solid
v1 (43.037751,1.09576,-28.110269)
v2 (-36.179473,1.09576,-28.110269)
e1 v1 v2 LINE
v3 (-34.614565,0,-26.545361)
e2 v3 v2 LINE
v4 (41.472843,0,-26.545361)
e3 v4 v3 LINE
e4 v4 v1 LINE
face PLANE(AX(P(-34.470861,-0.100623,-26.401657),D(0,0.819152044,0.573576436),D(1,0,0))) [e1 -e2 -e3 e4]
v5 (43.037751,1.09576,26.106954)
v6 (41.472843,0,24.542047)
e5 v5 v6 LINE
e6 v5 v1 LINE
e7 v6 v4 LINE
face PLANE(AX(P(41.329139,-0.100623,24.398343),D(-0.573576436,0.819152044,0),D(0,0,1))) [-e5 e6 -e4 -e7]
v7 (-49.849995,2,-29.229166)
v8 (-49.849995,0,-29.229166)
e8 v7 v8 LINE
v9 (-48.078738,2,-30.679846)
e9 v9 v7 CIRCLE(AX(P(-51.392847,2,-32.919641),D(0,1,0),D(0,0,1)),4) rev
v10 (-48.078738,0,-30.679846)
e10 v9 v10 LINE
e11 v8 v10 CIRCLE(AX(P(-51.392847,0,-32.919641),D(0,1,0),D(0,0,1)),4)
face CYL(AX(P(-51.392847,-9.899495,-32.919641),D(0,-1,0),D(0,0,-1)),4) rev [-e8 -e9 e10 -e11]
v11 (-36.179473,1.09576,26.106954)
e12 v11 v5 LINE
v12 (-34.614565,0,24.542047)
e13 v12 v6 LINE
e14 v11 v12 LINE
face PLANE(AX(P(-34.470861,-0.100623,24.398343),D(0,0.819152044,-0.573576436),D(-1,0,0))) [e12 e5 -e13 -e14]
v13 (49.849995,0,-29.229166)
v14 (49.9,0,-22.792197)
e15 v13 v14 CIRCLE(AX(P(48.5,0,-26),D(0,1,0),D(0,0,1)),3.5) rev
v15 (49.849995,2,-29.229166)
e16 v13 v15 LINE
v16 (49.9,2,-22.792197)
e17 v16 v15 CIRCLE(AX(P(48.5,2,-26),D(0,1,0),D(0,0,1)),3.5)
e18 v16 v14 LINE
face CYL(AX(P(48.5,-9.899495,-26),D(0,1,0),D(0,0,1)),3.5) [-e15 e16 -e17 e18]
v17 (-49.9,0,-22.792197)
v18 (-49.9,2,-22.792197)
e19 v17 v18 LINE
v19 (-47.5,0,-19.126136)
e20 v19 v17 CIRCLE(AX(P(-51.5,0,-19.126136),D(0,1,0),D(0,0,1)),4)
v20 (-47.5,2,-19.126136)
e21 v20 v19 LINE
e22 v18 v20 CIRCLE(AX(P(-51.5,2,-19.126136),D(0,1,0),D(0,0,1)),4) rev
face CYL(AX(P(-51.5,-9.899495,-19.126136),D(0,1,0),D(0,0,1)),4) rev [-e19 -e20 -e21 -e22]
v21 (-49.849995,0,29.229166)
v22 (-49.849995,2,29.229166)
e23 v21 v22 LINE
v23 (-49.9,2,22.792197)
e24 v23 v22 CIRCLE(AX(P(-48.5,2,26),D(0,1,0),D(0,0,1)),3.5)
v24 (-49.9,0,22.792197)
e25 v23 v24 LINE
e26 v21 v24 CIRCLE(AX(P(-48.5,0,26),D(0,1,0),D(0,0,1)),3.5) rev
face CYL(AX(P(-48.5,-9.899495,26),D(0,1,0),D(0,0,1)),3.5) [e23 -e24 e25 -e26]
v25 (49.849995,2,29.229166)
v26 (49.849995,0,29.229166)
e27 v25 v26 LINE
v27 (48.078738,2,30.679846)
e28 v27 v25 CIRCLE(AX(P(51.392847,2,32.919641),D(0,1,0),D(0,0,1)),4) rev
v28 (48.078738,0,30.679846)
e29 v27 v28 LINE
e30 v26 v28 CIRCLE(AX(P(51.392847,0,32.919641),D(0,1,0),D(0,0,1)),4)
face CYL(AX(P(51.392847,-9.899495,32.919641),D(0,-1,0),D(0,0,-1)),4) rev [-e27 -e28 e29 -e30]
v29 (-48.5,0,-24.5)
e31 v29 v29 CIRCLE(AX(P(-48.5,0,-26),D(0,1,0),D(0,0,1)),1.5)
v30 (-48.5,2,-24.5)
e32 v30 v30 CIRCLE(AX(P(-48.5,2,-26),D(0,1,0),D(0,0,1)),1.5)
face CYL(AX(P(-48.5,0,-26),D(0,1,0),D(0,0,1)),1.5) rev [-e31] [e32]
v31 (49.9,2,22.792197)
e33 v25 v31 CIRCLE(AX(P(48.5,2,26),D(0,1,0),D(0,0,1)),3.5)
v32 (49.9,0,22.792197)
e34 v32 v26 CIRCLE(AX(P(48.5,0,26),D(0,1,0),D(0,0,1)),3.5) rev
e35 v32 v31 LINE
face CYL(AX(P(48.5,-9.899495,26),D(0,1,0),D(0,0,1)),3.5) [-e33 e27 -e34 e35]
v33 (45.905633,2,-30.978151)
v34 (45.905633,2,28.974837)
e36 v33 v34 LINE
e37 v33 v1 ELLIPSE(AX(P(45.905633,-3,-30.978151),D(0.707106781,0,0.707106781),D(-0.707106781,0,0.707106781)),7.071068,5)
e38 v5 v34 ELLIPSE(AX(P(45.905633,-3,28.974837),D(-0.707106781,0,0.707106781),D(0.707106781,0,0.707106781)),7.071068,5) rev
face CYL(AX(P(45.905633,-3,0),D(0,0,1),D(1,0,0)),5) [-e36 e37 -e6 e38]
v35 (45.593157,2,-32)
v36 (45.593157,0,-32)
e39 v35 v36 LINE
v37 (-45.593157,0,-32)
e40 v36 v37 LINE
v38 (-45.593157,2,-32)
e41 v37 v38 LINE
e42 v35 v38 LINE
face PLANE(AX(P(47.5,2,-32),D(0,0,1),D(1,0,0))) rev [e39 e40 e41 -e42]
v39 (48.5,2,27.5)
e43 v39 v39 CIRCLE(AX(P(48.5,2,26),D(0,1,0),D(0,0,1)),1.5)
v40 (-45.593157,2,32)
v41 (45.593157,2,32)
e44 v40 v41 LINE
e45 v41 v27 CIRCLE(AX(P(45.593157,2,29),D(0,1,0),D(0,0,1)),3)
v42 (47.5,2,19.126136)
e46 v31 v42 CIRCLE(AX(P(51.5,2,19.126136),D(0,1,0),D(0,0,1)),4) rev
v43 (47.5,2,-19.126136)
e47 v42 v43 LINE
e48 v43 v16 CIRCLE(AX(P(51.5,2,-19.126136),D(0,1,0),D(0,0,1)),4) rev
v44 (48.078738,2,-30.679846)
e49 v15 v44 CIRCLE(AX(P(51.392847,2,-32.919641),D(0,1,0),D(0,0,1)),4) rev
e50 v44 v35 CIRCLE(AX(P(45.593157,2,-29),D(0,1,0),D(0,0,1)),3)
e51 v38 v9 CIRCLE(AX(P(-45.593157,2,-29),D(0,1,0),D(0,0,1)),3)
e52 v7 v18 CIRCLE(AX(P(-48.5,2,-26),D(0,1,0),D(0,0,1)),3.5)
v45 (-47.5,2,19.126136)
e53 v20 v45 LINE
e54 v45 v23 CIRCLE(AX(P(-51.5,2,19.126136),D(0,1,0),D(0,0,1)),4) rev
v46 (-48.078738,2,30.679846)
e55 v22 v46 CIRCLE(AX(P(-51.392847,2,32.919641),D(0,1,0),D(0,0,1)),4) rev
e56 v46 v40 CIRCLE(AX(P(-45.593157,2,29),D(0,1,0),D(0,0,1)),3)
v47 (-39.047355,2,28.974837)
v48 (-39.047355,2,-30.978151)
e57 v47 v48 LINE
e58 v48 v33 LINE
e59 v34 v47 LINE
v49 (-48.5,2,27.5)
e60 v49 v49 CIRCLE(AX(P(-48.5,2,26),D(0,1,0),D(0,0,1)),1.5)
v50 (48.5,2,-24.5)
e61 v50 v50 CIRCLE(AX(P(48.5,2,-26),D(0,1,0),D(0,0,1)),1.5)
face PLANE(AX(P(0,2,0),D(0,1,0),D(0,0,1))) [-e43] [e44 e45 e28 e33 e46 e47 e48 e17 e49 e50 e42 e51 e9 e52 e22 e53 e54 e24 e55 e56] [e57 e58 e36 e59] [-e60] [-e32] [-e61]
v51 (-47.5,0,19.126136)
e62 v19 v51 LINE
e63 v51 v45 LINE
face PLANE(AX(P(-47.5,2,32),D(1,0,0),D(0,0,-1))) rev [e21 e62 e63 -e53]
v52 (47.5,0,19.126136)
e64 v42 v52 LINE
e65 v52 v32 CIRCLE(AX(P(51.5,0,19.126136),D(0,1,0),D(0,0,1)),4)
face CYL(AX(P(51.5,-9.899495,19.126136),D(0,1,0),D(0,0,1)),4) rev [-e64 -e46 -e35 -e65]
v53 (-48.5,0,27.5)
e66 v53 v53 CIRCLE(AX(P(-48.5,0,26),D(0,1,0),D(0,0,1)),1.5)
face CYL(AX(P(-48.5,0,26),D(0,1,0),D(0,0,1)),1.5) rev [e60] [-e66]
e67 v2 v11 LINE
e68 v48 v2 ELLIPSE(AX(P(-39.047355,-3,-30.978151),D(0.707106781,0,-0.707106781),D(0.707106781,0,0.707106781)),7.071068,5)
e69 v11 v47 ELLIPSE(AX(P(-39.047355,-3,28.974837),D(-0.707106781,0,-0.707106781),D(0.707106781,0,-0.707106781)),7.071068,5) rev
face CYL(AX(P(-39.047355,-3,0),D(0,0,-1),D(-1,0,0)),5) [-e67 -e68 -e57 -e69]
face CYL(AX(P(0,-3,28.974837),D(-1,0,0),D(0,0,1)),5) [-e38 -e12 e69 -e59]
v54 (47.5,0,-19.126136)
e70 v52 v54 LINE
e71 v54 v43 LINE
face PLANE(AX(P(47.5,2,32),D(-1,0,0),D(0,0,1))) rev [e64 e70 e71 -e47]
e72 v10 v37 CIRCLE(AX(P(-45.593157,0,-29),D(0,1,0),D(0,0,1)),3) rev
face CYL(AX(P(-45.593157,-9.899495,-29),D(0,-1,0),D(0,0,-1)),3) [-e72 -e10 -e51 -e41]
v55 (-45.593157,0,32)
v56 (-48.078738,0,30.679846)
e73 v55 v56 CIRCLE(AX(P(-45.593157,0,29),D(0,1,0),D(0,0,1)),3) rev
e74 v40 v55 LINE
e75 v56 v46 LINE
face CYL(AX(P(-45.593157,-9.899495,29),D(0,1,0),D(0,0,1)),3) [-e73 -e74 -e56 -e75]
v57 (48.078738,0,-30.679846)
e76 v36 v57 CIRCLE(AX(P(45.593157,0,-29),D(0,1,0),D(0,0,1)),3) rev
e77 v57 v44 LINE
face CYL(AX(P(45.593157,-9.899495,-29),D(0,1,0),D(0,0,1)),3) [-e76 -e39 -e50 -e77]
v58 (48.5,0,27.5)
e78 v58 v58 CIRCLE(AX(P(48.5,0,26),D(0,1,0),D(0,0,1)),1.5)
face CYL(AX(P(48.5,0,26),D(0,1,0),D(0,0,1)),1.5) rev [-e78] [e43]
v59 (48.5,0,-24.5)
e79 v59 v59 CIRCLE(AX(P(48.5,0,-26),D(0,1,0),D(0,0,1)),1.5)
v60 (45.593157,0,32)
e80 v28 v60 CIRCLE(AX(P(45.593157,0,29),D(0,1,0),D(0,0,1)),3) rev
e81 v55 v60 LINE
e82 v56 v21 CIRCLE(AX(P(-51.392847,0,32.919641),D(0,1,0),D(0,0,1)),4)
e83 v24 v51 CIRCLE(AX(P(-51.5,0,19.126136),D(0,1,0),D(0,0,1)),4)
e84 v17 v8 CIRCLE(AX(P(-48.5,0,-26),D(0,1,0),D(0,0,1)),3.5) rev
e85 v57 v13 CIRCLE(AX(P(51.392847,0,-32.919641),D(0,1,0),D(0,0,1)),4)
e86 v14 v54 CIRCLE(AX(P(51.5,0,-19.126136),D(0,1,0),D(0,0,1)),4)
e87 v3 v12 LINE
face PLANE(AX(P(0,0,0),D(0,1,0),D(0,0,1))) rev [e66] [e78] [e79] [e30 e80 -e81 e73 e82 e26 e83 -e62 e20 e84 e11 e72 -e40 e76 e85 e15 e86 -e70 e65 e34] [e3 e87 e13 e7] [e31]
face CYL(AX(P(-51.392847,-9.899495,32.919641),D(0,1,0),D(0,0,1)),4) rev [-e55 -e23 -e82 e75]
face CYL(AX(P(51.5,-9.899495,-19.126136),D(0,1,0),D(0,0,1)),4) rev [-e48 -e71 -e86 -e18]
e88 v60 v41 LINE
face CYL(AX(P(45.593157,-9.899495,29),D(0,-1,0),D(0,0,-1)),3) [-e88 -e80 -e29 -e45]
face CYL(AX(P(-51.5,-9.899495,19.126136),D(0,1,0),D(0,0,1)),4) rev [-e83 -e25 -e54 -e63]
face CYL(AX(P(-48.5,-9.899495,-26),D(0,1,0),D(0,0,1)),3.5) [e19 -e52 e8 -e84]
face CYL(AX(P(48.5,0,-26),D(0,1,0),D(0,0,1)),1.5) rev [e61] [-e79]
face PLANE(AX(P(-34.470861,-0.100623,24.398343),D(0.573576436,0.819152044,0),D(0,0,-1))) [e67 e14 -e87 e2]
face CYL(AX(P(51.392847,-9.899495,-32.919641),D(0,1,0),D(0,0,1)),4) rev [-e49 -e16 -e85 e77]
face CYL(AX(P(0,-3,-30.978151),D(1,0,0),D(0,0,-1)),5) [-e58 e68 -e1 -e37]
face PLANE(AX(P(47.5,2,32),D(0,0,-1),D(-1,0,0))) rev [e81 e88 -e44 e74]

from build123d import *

# Parameters (mm, degrees)
SKETCH1_W           = 95
SKETCH1_H           = 64
BOSS_EXTRUDE1_DEPTH = 2
SKETCH2_R           = 3.5
BOSS_EXTRUDE2_DEPTH = 2
FILLET1_R           = 4
FILLET2_R           = 3
SKETCH3_R           = 1.5
CUT_EXTRUDE1_DEPTH  = 62.090097397
SKETCH4_W           = 75.8
SKETCH4_H           = 50.8
CUT_EXTRUDE2_DEPTH  = 62.090097397
CHAMFER1_SIZE       = 3
CHAMFER1_SIZE_2     = 2.100622615
FILLET3_R           = 5


with BuildPart() as part:
    # Sketch1 → Boss-Extrude1 (new body)
    with BuildSketch(Plane(origin=(0, 0, 0), x_dir=(1, 0, 0), z_dir=(0, 1, 0))):
        Rectangle(SKETCH1_W, SKETCH1_H)
    extrude(amount=BOSS_EXTRUDE1_DEPTH)

    # Sketch2 → Boss-Extrude2 (add)
    with BuildSketch(Plane(origin=(0, 2, 0), x_dir=(1, 0, 0), z_dir=(0, 1, 0))):
        with Locations((-48.5, -26)):
            Circle(SKETCH2_R)
        with Locations((-48.5, 26)):
            Circle(SKETCH2_R)
        with Locations((48.5, -26)):
            Circle(SKETCH2_R)
        with Locations((48.5, 26)):
            Circle(SKETCH2_R)
    extrude(amount=-BOSS_EXTRUDE2_DEPTH)

    # Fillet1
    # the kernel refuses this fillet: 4 mm, written as the material it adds along each edge
    with BuildSketch(Plane(origin=(-47.5, 0, -29.354101966), x_dir=(0, 0, -1), z_dir=(0, 1, 0))) as fillet1_piece_1:
        with BuildLine():
            CenterArc((3.565539249, 3.892847292), FILLET1_R, 202.68800958, 54.020199403)
            Line((-0.124936066, 2.349995403), (-0.198745572, 2.319138365))
            ThreePointArc((-0.198745572, 2.319138365), (0.061075022, 1.181565792), (-0.076665188, 0.022857143))
            Line((-0.076665188, 0.022857143), (0, -0.08))
            ThreePointArc((0, -0.08), (1.322949017, -0.08), (2.627505209, -0.077856946))
            Line((2.627505209, -0.077856946), (2.645898034, 0))
        make_face()
    extrude(amount=2)
    with BuildSketch(Plane(origin=(-47.5, 0, -22.645898034), x_dir=(-0.998147228603926, 0, -0.06084496717315217), z_dir=(0, 1, 0)), Plane(origin=(47.5, 0, 22.645898034), x_dir=(0.9981472286039255, 0, 0.06084496717316137), z_dir=(0, 1, 0))) as fillet1_piece_2:
        with BuildLine():
            CenterArc((3.778429137, 3.756620131), FILLET1_R, 183.48831444, 66.421821522)
            Line((-0.214159778, 3.513240263), (-0.294011556, 3.508372665))
            Line((-0.294011556, 3.508372665), (-0.079851778, -0.004867597))
            Line((-0.079851778, -0.004867597), (0.027479485, -0.075132403))
            ThreePointArc((0.027479485, -0.075132403), (1.202227453, 0.132957385), (2.376975421, -0.075132403))
            Line((2.376975421, -0.075132403), (2.404454905, 0))
        make_face()
    extrude(amount=2)
    with BuildSketch(Plane(origin=(-47.5, 0, 22.645898034), x_dir=(0, 0, -1), z_dir=(0, 1, 0)), Plane(origin=(47.5, 0, -22.645898034), x_dir=(0, 0, 1), z_dir=(0, 1, 0))) as fillet1_piece_3:
        with BuildLine():
            CenterArc((3.519761576, 4), FILLET1_R, 203.578178478, 66.421821522)
            Line((-0.14629898, 2.4), (-0.219620191, 2.368))
            ThreePointArc((-0.219620191, 2.368), (0.059561556, 1.208089788), (-0.076665188, 0.022857143))
            Line((-0.076665188, 0.022857143), (0, -0.08))
            Line((0, -0.08), (3.519761576, -0.08))
            Line((3.519761576, -0.08), (3.519761576, 0))
        make_face()
    extrude(amount=2)
    with BuildSketch(Plane(origin=(-47.5, 0, 29.354101966), x_dir=(-0.9985897627331907, 0, -0.05308941292263453), z_dir=(0, 1, 0)), Plane(origin=(47.5, 0, -29.354101966), x_dir=(0.9985897627331903, 0, 0.053089412922639356), z_dir=(0, 1, 0))) as fillet1_piece_4:
        with BuildLine():
            CenterArc((3.698065068, 3.76717997), FILLET1_R, 196.335021008, 54.020199403)
            Line((-0.140469173, 2.64216669), (-0.217239858, 2.619666424))
            ThreePointArc((-0.217239858, 2.619666424), (-0.150121768, 1.316836192), (-0.079887181, -0.004247153))
            Line((-0.079887181, -0.004247153), (0.026895019, -0.075343599))
            ThreePointArc((0.026895019, -0.075343599), (1.176657067, 0.123717526), (2.326419115, -0.075343599))
            Line((2.326419115, -0.075343599), (2.353314134, 0))
        make_face()
    extrude(amount=2)
    with BuildSketch(Plane(origin=(47.5, 0, 29.354101966), x_dir=(0.9985897627331901, 0, -0.05308941292264221), z_dir=(0, 1, 0))) as fillet1_piece_5:
        with BuildLine():
            CenterArc((3.698065068, -3.76717997), FILLET1_R, 109.64477959, 54.020199403)
            Line((-0.140469173, -2.64216669), (-0.217239858, -2.619666424))
            ThreePointArc((-0.217239858, -2.619666424), (-0.150121768, -1.316836192), (-0.079887181, 0.004247153))
            Line((-0.079887181, 0.004247153), (0.026895019, 0.075343599))
            ThreePointArc((0.026895019, 0.075343599), (1.176657067, -0.123717526), (2.326419115, 0.075343599))
            Line((2.326419115, 0.075343599), (2.353314134, 0))
        make_face()
    extrude(amount=2)

    # Fillet2
    fillet2_edges = [part.edges().sort_by_distance(p)[0] for p in [
        (-47.5, 1, -32),
        (47.5, 1, -32),
        (47.5, 1, 32),
        (-47.5, 1, 32),
    ]]
    fillet(fillet2_edges, radius=FILLET2_R)

    # Sketch3 → Cut-Extrude1 (cut, through all)
    with BuildSketch(Plane(origin=(0, 2, 0), x_dir=(1, 0, 0), z_dir=(0, 1, 0))):
        with Locations(Location((48.5, -26, 0), (0, 0, 270))):
            Circle(SKETCH3_R)
        with Locations(Location((48.5, 26, 0), (0, 0, 270))):
            Circle(SKETCH3_R)
        with Locations(Location((-48.5, 26, 0), (0, 0, 270))):
            Circle(SKETCH3_R)
        with Locations(Location((-48.5, -26, 0), (0, 0, 270))):
            Circle(SKETCH3_R)
    extrude(amount=-CUT_EXTRUDE1_DEPTH, mode=Mode.SUBTRACT)

    # Sketch4 → Cut-Extrude2 (cut, through all)
    with BuildSketch(Plane(origin=(0, 2, 0), x_dir=(1, 0, 0), z_dir=(0, 1, 0))):
        with Locations((3.429138832, 1.001657313)):
            Rectangle(SKETCH4_W, SKETCH4_H)
    extrude(amount=-CUT_EXTRUDE2_DEPTH, mode=Mode.SUBTRACT)

    # Chamfer1
    # the kernel refuses this chamfer: 3, 2.100622615 mm, written as the material it takes off along each edge
    with BuildSketch(Plane(origin=(-34.470861168, 2, -26.401657313), x_dir=(-0.9997533347641299, 0.022209674198456996, 0), z_dir=(0, 0, 1)), Plane(origin=(41.329138832, 2, 24.398342687), x_dir=(0.9997533347641299, 0.022209674198456996, 0), z_dir=(0, 0, -1))) as chamfer1_piece_1:
        Polygon((CHAMFER1_SIZE * 0.999753334764, CHAMFER1_SIZE * 0.0222096741985), (-CHAMFER1_SIZE_2 * 0.0222096741945, CHAMFER1_SIZE_2 * 0.999753334588), (0, 0), align=None)
    extrude(amount=50.8, mode=Mode.SUBTRACT)
    with BuildSketch(Plane(origin=(-34.470861168, 2, 24.398342687), x_dir=(0, 0.022209674198456996, 0.9997533347641299), z_dir=(1, 0, 0)), Plane(origin=(41.329138832, 2, -26.401657313), x_dir=(0, 0.022209674198456972, -0.99975333476413), z_dir=(-1, 0, 0))) as chamfer1_piece_2:
        Polygon((CHAMFER1_SIZE * 0.999753334764, CHAMFER1_SIZE * 0.0222096741985), (-CHAMFER1_SIZE_2 * 0.0222096741945, CHAMFER1_SIZE_2 * 0.999753334588), (0, 0), align=None)
    extrude(amount=75.8, mode=Mode.SUBTRACT)
    with BuildSketch(Plane(origin=(-34.470861168, 2, -34.149314004), x_dir=(-0.9997533347641299, 0.022209674198456996, 0), z_dir=(0, 0, 1))) as chamfer1_piece_3a_section:
        Polygon((CHAMFER1_SIZE * 0.999753334764, CHAMFER1_SIZE * 0.0222096741985), (-CHAMFER1_SIZE_2 * 0.0222096741945, CHAMFER1_SIZE_2 * 0.999753334588), (0, 0), align=None)
    chamfer1_piece_3a = extrude(amount=58.547656691, mode=Mode.PRIVATE)
    chamfer1_piece_3a = split(chamfer1_piece_3a, bisect_by=Plane(origin=(-35.470351342, 1.318269678, -26.401657313), z_dir=(0, 0, -1)), keep=Keep.TOP, mode=Mode.PRIVATE)
    with BuildSketch(Plane(origin=(41.329138832, 2, -26.401657313), x_dir=(0, 0.022209674198456972, -0.99975333476413), z_dir=(-1, 0, 0))) as chamfer1_piece_3b_section:
        Polygon((CHAMFER1_SIZE * 0.999753334764, CHAMFER1_SIZE * 0.0222096741985), (-CHAMFER1_SIZE_2 * 0.0222096741945, CHAMFER1_SIZE_2 * 0.999753334588), (0, 0), align=None)
    chamfer1_piece_3b = extrude(amount=83.547656691, mode=Mode.PRIVATE)
    chamfer1_piece_3b = split(chamfer1_piece_3b, bisect_by=Plane(origin=(-34.470861168, 1.318269678, -27.401147488), z_dir=(-1, 0, 0)), keep=Keep.TOP, mode=Mode.PRIVATE)
    chamfer1_piece_3 = chamfer1_piece_3a & chamfer1_piece_3b
    add(chamfer1_piece_3, mode=Mode.SUBTRACT)
    with BuildSketch(Plane(origin=(-34.470861168, 2, -26.401657313), x_dir=(-0.9997533347641299, 0.022209674198456996, 0), z_dir=(0, 0, 1))) as chamfer1_piece_4a_section:
        Polygon((CHAMFER1_SIZE * 0.999753334764, CHAMFER1_SIZE * 0.0222096741985), (-CHAMFER1_SIZE_2 * 0.0222096741945, CHAMFER1_SIZE_2 * 0.999753334588), (0, 0), align=None)
    chamfer1_piece_4a = extrude(amount=58.547656691, mode=Mode.PRIVATE)
    chamfer1_piece_4a = split(chamfer1_piece_4a, bisect_by=Plane(origin=(-35.470351342, 1.318269678, 24.398342687), z_dir=(0, 0, 1)), keep=Keep.TOP, mode=Mode.PRIVATE)
    with BuildSketch(Plane(origin=(-42.218517859, 2, 24.398342687), x_dir=(0, 0.022209674198456996, 0.9997533347641299), z_dir=(1, 0, 0))) as chamfer1_piece_4b_section:
        Polygon((CHAMFER1_SIZE * 0.999753334764, CHAMFER1_SIZE * 0.0222096741985), (-CHAMFER1_SIZE_2 * 0.0222096741945, CHAMFER1_SIZE_2 * 0.999753334588), (0, 0), align=None)
    chamfer1_piece_4b = extrude(amount=83.547656691, mode=Mode.PRIVATE)
    chamfer1_piece_4b = split(chamfer1_piece_4b, bisect_by=Plane(origin=(-34.470861168, 1.318269678, 25.397832861), z_dir=(-1, 0, 0)), keep=Keep.TOP, mode=Mode.PRIVATE)
    chamfer1_piece_4 = chamfer1_piece_4a & chamfer1_piece_4b
    add(chamfer1_piece_4, mode=Mode.SUBTRACT)
    with BuildSketch(Plane(origin=(41.329138832, 2, 32.145999377), x_dir=(0.9997533347641299, 0.022209674198456996, 0), z_dir=(0, 0, -1))) as chamfer1_piece_5a_section:
        Polygon((CHAMFER1_SIZE * 0.999753334764, CHAMFER1_SIZE * 0.0222096741985), (-CHAMFER1_SIZE_2 * 0.0222096741945, CHAMFER1_SIZE_2 * 0.999753334588), (0, 0), align=None)
    chamfer1_piece_5a = extrude(amount=58.547656691, mode=Mode.PRIVATE)
    chamfer1_piece_5a = split(chamfer1_piece_5a, bisect_by=Plane(origin=(42.328629006, 1.318269678, 24.398342687), z_dir=(0, 0, 1)), keep=Keep.TOP, mode=Mode.PRIVATE)
    with BuildSketch(Plane(origin=(-34.470861168, 2, 24.398342687), x_dir=(0, 0.022209674198456996, 0.9997533347641299), z_dir=(1, 0, 0))) as chamfer1_piece_5b_section:
        Polygon((CHAMFER1_SIZE * 0.999753334764, CHAMFER1_SIZE * 0.0222096741985), (-CHAMFER1_SIZE_2 * 0.0222096741945, CHAMFER1_SIZE_2 * 0.999753334588), (0, 0), align=None)
    chamfer1_piece_5b = extrude(amount=83.547656691, mode=Mode.PRIVATE)
    chamfer1_piece_5b = split(chamfer1_piece_5b, bisect_by=Plane(origin=(41.329138832, 1.318269678, 25.397832861), z_dir=(1, 0, 0)), keep=Keep.TOP, mode=Mode.PRIVATE)
    chamfer1_piece_5 = chamfer1_piece_5a & chamfer1_piece_5b
    add(chamfer1_piece_5, mode=Mode.SUBTRACT)
    with BuildSketch(Plane(origin=(49.076795523, 2, -26.401657313), x_dir=(0, 0.022209674198456944, -0.9997533347641299), z_dir=(-1, 0, 0))) as chamfer1_piece_6a_section:
        Polygon((CHAMFER1_SIZE * 0.999753334764, CHAMFER1_SIZE * 0.0222096741985), (-CHAMFER1_SIZE_2 * 0.0222096741945, CHAMFER1_SIZE_2 * 0.999753334588), (0, 0), align=None)
    chamfer1_piece_6a = extrude(amount=83.547656691, mode=Mode.PRIVATE)
    chamfer1_piece_6a = split(chamfer1_piece_6a, bisect_by=Plane(origin=(41.329138832, 1.318269678, -27.401147488), z_dir=(1, 0, 0)), keep=Keep.TOP, mode=Mode.PRIVATE)
    with BuildSketch(Plane(origin=(41.329138832, 2, 24.398342687), x_dir=(0.9997533347641299, 0.022209674198456996, 0), z_dir=(0, 0, -1))) as chamfer1_piece_6b_section:
        Polygon((CHAMFER1_SIZE * 0.999753334764, CHAMFER1_SIZE * 0.0222096741985), (-CHAMFER1_SIZE_2 * 0.0222096741945, CHAMFER1_SIZE_2 * 0.999753334588), (0, 0), align=None)
    chamfer1_piece_6b = extrude(amount=58.547656691, mode=Mode.PRIVATE)
    chamfer1_piece_6b = split(chamfer1_piece_6b, bisect_by=Plane(origin=(42.328629006, 1.318269678, -26.401657313), z_dir=(0, 0, -1)), keep=Keep.TOP, mode=Mode.PRIVATE)
    chamfer1_piece_6 = chamfer1_piece_6a & chamfer1_piece_6b
    add(chamfer1_piece_6, mode=Mode.SUBTRACT)

    # Fillet3
    fillet3_edges = [part.edges().sort_by_distance(p)[0] for p in [
        (3.429138832, 2, 27.398342687),
        (44.329138832, 2, -1.001657313),
        (3.429138832, 2, -29.401657313),
        (-37.470861168, 2, -1.001657313),
    ]]
    fillet(fillet3_edges, radius=FILLET3_R)


solid = part.part
